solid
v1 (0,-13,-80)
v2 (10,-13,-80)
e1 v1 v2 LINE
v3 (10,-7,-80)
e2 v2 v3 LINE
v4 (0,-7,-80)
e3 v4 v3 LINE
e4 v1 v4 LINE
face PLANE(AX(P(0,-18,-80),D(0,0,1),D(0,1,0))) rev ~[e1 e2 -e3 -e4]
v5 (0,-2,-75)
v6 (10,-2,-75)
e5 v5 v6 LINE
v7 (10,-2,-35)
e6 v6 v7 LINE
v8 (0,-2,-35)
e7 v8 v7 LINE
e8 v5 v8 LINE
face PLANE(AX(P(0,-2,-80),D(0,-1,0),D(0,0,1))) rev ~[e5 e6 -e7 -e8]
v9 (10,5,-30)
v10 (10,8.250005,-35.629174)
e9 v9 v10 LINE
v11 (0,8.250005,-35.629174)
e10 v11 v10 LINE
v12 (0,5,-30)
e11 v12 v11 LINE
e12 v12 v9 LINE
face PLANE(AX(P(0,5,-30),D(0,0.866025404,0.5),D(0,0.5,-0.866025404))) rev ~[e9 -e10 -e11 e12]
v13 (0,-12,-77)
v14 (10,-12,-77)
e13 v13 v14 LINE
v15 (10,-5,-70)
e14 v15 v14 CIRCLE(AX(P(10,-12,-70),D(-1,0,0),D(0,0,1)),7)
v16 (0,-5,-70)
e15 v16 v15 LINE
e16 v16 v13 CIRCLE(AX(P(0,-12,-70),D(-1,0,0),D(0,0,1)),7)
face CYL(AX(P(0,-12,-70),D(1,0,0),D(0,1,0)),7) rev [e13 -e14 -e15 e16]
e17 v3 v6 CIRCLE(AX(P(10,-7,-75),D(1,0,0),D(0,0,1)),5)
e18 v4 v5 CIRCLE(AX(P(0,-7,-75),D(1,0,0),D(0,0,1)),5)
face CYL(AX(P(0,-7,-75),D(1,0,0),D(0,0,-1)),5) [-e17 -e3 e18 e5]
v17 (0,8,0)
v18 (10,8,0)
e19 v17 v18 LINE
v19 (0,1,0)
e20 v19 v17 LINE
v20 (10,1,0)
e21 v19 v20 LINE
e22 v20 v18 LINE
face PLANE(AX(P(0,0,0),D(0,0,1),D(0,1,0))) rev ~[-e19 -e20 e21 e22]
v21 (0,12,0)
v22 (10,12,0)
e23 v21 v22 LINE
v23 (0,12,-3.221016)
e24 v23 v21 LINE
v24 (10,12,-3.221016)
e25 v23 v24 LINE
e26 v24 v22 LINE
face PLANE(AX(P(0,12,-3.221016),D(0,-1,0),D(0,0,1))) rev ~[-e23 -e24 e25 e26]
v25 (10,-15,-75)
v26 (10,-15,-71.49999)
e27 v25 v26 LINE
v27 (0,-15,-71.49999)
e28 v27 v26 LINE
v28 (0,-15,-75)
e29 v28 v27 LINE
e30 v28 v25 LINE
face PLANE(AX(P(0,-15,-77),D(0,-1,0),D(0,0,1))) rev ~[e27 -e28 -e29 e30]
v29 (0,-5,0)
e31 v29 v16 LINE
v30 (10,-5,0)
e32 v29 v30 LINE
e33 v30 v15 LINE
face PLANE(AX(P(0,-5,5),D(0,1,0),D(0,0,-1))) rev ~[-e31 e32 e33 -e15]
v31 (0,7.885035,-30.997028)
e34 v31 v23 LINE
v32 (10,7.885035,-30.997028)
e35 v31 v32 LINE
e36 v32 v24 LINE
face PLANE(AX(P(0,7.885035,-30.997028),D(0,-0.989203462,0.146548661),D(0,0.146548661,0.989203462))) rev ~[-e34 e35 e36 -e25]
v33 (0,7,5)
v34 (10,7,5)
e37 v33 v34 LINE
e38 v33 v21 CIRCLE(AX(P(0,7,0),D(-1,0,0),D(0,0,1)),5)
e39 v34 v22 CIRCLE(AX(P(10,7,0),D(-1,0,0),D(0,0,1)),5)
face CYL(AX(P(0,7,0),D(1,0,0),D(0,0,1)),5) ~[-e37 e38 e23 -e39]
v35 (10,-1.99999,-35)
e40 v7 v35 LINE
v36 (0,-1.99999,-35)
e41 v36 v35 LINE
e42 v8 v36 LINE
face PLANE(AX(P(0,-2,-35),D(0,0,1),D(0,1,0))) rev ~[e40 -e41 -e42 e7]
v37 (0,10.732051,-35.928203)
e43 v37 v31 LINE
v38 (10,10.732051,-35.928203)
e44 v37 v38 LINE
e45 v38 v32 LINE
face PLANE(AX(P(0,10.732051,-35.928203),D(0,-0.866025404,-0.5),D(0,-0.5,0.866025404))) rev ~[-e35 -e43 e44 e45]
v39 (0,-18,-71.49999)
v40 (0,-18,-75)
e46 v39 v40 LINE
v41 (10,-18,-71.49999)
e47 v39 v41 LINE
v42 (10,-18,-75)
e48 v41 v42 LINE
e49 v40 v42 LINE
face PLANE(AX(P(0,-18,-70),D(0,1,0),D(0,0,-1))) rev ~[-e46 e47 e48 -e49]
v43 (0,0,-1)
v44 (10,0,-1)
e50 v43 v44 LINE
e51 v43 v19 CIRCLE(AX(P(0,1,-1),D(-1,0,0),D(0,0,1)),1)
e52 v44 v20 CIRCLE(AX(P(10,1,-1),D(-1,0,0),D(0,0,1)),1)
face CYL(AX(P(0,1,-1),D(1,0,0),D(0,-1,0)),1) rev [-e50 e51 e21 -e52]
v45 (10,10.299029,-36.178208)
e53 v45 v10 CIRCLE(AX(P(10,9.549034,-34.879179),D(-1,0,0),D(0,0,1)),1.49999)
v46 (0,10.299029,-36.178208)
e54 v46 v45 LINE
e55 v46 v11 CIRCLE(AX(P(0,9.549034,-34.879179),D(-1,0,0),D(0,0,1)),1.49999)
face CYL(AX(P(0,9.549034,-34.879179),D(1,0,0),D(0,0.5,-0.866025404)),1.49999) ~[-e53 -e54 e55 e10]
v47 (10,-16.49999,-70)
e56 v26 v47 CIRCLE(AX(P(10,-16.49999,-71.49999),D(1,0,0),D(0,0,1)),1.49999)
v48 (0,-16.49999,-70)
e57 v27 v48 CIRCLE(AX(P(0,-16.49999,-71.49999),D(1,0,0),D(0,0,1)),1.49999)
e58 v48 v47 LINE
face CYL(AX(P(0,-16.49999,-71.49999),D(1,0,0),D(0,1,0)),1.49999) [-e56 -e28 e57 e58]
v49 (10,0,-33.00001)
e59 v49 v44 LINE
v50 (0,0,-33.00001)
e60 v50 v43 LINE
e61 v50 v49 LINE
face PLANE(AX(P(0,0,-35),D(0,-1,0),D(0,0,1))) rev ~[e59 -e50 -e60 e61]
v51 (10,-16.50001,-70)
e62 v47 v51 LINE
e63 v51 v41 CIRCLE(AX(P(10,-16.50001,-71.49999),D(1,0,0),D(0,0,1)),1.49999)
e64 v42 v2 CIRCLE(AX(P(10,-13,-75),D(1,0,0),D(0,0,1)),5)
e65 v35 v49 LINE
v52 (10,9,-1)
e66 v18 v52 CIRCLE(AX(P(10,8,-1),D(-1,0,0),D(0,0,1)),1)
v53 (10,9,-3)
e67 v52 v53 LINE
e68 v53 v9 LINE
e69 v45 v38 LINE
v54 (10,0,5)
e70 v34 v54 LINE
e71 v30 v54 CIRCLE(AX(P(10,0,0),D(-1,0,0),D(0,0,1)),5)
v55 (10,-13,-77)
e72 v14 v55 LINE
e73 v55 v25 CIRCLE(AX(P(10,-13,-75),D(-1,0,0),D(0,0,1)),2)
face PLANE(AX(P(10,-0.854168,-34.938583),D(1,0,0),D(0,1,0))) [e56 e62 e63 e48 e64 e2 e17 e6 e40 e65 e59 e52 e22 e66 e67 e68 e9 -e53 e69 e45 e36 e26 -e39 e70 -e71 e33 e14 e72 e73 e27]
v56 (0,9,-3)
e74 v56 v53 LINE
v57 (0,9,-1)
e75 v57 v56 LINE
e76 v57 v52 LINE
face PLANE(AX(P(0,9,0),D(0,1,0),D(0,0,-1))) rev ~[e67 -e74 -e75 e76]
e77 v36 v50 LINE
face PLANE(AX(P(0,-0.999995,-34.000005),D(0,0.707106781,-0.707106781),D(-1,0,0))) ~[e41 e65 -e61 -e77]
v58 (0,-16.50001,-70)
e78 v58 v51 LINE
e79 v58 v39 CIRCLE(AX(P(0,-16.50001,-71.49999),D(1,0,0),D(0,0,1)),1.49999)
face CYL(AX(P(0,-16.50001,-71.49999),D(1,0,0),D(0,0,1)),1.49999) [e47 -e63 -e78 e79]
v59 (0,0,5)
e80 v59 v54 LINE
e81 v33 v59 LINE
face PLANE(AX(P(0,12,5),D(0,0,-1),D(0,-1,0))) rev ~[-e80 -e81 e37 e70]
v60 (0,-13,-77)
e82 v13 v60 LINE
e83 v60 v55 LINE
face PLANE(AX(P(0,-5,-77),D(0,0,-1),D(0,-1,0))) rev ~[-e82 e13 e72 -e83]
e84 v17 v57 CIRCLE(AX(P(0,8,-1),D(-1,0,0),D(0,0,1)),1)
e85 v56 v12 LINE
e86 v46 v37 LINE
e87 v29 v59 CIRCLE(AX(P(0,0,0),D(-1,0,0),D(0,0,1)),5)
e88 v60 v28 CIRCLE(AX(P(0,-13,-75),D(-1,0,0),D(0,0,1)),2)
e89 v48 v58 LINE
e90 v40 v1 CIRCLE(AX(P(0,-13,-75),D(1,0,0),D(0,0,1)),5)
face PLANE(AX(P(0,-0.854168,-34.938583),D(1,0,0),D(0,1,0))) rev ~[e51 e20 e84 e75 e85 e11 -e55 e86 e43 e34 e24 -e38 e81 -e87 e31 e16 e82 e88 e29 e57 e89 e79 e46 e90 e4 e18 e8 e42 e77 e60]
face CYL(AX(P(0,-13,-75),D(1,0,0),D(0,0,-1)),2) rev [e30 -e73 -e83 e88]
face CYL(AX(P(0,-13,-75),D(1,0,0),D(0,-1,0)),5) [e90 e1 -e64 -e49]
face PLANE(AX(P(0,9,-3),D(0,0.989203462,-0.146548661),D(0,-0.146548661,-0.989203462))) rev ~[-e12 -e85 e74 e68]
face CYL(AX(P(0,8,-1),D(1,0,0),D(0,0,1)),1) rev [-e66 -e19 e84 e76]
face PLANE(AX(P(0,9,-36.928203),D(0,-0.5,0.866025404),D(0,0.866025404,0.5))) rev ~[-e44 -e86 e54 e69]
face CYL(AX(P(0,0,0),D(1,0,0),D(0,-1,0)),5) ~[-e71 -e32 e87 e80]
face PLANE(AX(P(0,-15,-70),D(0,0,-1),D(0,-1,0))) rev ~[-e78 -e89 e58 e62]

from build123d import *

# Parameters (mm, degrees)
F1_DEPTH = 10
F2_R     = 7
F3_R     = 2
F4_R     = 5
F5_R     = 1.49999
F6_SIZE  = 1.99999
F7_R     = 1


# Not quite as in the source:
# - a fillet or chamfer is up to 0.001 mm smaller than in the source, because OpenCascade refuses the exact size


with BuildPart() as f1:
    # F0 (on Right) → F1 (new body)
    with BuildSketch(Plane.YZ):
        Polygon((0, -35), (0, 0), (9, 0), (9, -3), (5, -30), (9, -36.9282032303), (10.7320508076, -35.9282032303), (7.8850353118, -30.9970277416), (12, -3.2210160959), (12, 5), (-5, 5), (-5, -77), (-15, -77), (-15, -70), (-18, -70), (-18, -80), (-2, -80), (-2, -35), align=None)
    extrude(amount=F1_DEPTH)

    # F2
    f2_edges = [f1.edges().sort_by_distance(p)[0] for p in [
        (5, -5, -77),
    ]]
    fillet(f2_edges, radius=F2_R)

    # F3
    f3_edges = [f1.edges().sort_by_distance(p)[0] for p in [
        (5, -15, -77),
    ]]
    fillet(f3_edges, radius=F3_R)

    # F4
    f4_edges = [f1.edges().sort_by_distance(p)[0] for p in [
        (5, -5, 5),
        (5, 12, 5),
        (5, -18, -80),
        (5, -2, -80),
    ]]
    fillet(f4_edges, radius=F4_R)

    # F5 (radius 1.5 in the source; OpenCascade refuses exactly that, so slightly less here)
    f5_edges = [f1.edges().sort_by_distance(p)[0] for p in [
        (5, 9, -36.928203),
        (5, -18, -70),
        (5, -15, -70),
    ]]
    fillet(f5_edges, radius=F5_R)

    # F6 (size 2 in the source; OpenCascade refuses exactly that, so slightly less here)
    f6_edges = [f1.edges().sort_by_distance(p)[0] for p in [
        (5, 0, -35),
    ]]
    chamfer(f6_edges, length=F6_SIZE)

    # F7
    f7_edges = [f1.edges().sort_by_distance(p)[0] for p in [
        (5, 0, 0),
        (5, 9, 0),
    ]]
    fillet(f7_edges, radius=F7_R)


solid = f1.part
